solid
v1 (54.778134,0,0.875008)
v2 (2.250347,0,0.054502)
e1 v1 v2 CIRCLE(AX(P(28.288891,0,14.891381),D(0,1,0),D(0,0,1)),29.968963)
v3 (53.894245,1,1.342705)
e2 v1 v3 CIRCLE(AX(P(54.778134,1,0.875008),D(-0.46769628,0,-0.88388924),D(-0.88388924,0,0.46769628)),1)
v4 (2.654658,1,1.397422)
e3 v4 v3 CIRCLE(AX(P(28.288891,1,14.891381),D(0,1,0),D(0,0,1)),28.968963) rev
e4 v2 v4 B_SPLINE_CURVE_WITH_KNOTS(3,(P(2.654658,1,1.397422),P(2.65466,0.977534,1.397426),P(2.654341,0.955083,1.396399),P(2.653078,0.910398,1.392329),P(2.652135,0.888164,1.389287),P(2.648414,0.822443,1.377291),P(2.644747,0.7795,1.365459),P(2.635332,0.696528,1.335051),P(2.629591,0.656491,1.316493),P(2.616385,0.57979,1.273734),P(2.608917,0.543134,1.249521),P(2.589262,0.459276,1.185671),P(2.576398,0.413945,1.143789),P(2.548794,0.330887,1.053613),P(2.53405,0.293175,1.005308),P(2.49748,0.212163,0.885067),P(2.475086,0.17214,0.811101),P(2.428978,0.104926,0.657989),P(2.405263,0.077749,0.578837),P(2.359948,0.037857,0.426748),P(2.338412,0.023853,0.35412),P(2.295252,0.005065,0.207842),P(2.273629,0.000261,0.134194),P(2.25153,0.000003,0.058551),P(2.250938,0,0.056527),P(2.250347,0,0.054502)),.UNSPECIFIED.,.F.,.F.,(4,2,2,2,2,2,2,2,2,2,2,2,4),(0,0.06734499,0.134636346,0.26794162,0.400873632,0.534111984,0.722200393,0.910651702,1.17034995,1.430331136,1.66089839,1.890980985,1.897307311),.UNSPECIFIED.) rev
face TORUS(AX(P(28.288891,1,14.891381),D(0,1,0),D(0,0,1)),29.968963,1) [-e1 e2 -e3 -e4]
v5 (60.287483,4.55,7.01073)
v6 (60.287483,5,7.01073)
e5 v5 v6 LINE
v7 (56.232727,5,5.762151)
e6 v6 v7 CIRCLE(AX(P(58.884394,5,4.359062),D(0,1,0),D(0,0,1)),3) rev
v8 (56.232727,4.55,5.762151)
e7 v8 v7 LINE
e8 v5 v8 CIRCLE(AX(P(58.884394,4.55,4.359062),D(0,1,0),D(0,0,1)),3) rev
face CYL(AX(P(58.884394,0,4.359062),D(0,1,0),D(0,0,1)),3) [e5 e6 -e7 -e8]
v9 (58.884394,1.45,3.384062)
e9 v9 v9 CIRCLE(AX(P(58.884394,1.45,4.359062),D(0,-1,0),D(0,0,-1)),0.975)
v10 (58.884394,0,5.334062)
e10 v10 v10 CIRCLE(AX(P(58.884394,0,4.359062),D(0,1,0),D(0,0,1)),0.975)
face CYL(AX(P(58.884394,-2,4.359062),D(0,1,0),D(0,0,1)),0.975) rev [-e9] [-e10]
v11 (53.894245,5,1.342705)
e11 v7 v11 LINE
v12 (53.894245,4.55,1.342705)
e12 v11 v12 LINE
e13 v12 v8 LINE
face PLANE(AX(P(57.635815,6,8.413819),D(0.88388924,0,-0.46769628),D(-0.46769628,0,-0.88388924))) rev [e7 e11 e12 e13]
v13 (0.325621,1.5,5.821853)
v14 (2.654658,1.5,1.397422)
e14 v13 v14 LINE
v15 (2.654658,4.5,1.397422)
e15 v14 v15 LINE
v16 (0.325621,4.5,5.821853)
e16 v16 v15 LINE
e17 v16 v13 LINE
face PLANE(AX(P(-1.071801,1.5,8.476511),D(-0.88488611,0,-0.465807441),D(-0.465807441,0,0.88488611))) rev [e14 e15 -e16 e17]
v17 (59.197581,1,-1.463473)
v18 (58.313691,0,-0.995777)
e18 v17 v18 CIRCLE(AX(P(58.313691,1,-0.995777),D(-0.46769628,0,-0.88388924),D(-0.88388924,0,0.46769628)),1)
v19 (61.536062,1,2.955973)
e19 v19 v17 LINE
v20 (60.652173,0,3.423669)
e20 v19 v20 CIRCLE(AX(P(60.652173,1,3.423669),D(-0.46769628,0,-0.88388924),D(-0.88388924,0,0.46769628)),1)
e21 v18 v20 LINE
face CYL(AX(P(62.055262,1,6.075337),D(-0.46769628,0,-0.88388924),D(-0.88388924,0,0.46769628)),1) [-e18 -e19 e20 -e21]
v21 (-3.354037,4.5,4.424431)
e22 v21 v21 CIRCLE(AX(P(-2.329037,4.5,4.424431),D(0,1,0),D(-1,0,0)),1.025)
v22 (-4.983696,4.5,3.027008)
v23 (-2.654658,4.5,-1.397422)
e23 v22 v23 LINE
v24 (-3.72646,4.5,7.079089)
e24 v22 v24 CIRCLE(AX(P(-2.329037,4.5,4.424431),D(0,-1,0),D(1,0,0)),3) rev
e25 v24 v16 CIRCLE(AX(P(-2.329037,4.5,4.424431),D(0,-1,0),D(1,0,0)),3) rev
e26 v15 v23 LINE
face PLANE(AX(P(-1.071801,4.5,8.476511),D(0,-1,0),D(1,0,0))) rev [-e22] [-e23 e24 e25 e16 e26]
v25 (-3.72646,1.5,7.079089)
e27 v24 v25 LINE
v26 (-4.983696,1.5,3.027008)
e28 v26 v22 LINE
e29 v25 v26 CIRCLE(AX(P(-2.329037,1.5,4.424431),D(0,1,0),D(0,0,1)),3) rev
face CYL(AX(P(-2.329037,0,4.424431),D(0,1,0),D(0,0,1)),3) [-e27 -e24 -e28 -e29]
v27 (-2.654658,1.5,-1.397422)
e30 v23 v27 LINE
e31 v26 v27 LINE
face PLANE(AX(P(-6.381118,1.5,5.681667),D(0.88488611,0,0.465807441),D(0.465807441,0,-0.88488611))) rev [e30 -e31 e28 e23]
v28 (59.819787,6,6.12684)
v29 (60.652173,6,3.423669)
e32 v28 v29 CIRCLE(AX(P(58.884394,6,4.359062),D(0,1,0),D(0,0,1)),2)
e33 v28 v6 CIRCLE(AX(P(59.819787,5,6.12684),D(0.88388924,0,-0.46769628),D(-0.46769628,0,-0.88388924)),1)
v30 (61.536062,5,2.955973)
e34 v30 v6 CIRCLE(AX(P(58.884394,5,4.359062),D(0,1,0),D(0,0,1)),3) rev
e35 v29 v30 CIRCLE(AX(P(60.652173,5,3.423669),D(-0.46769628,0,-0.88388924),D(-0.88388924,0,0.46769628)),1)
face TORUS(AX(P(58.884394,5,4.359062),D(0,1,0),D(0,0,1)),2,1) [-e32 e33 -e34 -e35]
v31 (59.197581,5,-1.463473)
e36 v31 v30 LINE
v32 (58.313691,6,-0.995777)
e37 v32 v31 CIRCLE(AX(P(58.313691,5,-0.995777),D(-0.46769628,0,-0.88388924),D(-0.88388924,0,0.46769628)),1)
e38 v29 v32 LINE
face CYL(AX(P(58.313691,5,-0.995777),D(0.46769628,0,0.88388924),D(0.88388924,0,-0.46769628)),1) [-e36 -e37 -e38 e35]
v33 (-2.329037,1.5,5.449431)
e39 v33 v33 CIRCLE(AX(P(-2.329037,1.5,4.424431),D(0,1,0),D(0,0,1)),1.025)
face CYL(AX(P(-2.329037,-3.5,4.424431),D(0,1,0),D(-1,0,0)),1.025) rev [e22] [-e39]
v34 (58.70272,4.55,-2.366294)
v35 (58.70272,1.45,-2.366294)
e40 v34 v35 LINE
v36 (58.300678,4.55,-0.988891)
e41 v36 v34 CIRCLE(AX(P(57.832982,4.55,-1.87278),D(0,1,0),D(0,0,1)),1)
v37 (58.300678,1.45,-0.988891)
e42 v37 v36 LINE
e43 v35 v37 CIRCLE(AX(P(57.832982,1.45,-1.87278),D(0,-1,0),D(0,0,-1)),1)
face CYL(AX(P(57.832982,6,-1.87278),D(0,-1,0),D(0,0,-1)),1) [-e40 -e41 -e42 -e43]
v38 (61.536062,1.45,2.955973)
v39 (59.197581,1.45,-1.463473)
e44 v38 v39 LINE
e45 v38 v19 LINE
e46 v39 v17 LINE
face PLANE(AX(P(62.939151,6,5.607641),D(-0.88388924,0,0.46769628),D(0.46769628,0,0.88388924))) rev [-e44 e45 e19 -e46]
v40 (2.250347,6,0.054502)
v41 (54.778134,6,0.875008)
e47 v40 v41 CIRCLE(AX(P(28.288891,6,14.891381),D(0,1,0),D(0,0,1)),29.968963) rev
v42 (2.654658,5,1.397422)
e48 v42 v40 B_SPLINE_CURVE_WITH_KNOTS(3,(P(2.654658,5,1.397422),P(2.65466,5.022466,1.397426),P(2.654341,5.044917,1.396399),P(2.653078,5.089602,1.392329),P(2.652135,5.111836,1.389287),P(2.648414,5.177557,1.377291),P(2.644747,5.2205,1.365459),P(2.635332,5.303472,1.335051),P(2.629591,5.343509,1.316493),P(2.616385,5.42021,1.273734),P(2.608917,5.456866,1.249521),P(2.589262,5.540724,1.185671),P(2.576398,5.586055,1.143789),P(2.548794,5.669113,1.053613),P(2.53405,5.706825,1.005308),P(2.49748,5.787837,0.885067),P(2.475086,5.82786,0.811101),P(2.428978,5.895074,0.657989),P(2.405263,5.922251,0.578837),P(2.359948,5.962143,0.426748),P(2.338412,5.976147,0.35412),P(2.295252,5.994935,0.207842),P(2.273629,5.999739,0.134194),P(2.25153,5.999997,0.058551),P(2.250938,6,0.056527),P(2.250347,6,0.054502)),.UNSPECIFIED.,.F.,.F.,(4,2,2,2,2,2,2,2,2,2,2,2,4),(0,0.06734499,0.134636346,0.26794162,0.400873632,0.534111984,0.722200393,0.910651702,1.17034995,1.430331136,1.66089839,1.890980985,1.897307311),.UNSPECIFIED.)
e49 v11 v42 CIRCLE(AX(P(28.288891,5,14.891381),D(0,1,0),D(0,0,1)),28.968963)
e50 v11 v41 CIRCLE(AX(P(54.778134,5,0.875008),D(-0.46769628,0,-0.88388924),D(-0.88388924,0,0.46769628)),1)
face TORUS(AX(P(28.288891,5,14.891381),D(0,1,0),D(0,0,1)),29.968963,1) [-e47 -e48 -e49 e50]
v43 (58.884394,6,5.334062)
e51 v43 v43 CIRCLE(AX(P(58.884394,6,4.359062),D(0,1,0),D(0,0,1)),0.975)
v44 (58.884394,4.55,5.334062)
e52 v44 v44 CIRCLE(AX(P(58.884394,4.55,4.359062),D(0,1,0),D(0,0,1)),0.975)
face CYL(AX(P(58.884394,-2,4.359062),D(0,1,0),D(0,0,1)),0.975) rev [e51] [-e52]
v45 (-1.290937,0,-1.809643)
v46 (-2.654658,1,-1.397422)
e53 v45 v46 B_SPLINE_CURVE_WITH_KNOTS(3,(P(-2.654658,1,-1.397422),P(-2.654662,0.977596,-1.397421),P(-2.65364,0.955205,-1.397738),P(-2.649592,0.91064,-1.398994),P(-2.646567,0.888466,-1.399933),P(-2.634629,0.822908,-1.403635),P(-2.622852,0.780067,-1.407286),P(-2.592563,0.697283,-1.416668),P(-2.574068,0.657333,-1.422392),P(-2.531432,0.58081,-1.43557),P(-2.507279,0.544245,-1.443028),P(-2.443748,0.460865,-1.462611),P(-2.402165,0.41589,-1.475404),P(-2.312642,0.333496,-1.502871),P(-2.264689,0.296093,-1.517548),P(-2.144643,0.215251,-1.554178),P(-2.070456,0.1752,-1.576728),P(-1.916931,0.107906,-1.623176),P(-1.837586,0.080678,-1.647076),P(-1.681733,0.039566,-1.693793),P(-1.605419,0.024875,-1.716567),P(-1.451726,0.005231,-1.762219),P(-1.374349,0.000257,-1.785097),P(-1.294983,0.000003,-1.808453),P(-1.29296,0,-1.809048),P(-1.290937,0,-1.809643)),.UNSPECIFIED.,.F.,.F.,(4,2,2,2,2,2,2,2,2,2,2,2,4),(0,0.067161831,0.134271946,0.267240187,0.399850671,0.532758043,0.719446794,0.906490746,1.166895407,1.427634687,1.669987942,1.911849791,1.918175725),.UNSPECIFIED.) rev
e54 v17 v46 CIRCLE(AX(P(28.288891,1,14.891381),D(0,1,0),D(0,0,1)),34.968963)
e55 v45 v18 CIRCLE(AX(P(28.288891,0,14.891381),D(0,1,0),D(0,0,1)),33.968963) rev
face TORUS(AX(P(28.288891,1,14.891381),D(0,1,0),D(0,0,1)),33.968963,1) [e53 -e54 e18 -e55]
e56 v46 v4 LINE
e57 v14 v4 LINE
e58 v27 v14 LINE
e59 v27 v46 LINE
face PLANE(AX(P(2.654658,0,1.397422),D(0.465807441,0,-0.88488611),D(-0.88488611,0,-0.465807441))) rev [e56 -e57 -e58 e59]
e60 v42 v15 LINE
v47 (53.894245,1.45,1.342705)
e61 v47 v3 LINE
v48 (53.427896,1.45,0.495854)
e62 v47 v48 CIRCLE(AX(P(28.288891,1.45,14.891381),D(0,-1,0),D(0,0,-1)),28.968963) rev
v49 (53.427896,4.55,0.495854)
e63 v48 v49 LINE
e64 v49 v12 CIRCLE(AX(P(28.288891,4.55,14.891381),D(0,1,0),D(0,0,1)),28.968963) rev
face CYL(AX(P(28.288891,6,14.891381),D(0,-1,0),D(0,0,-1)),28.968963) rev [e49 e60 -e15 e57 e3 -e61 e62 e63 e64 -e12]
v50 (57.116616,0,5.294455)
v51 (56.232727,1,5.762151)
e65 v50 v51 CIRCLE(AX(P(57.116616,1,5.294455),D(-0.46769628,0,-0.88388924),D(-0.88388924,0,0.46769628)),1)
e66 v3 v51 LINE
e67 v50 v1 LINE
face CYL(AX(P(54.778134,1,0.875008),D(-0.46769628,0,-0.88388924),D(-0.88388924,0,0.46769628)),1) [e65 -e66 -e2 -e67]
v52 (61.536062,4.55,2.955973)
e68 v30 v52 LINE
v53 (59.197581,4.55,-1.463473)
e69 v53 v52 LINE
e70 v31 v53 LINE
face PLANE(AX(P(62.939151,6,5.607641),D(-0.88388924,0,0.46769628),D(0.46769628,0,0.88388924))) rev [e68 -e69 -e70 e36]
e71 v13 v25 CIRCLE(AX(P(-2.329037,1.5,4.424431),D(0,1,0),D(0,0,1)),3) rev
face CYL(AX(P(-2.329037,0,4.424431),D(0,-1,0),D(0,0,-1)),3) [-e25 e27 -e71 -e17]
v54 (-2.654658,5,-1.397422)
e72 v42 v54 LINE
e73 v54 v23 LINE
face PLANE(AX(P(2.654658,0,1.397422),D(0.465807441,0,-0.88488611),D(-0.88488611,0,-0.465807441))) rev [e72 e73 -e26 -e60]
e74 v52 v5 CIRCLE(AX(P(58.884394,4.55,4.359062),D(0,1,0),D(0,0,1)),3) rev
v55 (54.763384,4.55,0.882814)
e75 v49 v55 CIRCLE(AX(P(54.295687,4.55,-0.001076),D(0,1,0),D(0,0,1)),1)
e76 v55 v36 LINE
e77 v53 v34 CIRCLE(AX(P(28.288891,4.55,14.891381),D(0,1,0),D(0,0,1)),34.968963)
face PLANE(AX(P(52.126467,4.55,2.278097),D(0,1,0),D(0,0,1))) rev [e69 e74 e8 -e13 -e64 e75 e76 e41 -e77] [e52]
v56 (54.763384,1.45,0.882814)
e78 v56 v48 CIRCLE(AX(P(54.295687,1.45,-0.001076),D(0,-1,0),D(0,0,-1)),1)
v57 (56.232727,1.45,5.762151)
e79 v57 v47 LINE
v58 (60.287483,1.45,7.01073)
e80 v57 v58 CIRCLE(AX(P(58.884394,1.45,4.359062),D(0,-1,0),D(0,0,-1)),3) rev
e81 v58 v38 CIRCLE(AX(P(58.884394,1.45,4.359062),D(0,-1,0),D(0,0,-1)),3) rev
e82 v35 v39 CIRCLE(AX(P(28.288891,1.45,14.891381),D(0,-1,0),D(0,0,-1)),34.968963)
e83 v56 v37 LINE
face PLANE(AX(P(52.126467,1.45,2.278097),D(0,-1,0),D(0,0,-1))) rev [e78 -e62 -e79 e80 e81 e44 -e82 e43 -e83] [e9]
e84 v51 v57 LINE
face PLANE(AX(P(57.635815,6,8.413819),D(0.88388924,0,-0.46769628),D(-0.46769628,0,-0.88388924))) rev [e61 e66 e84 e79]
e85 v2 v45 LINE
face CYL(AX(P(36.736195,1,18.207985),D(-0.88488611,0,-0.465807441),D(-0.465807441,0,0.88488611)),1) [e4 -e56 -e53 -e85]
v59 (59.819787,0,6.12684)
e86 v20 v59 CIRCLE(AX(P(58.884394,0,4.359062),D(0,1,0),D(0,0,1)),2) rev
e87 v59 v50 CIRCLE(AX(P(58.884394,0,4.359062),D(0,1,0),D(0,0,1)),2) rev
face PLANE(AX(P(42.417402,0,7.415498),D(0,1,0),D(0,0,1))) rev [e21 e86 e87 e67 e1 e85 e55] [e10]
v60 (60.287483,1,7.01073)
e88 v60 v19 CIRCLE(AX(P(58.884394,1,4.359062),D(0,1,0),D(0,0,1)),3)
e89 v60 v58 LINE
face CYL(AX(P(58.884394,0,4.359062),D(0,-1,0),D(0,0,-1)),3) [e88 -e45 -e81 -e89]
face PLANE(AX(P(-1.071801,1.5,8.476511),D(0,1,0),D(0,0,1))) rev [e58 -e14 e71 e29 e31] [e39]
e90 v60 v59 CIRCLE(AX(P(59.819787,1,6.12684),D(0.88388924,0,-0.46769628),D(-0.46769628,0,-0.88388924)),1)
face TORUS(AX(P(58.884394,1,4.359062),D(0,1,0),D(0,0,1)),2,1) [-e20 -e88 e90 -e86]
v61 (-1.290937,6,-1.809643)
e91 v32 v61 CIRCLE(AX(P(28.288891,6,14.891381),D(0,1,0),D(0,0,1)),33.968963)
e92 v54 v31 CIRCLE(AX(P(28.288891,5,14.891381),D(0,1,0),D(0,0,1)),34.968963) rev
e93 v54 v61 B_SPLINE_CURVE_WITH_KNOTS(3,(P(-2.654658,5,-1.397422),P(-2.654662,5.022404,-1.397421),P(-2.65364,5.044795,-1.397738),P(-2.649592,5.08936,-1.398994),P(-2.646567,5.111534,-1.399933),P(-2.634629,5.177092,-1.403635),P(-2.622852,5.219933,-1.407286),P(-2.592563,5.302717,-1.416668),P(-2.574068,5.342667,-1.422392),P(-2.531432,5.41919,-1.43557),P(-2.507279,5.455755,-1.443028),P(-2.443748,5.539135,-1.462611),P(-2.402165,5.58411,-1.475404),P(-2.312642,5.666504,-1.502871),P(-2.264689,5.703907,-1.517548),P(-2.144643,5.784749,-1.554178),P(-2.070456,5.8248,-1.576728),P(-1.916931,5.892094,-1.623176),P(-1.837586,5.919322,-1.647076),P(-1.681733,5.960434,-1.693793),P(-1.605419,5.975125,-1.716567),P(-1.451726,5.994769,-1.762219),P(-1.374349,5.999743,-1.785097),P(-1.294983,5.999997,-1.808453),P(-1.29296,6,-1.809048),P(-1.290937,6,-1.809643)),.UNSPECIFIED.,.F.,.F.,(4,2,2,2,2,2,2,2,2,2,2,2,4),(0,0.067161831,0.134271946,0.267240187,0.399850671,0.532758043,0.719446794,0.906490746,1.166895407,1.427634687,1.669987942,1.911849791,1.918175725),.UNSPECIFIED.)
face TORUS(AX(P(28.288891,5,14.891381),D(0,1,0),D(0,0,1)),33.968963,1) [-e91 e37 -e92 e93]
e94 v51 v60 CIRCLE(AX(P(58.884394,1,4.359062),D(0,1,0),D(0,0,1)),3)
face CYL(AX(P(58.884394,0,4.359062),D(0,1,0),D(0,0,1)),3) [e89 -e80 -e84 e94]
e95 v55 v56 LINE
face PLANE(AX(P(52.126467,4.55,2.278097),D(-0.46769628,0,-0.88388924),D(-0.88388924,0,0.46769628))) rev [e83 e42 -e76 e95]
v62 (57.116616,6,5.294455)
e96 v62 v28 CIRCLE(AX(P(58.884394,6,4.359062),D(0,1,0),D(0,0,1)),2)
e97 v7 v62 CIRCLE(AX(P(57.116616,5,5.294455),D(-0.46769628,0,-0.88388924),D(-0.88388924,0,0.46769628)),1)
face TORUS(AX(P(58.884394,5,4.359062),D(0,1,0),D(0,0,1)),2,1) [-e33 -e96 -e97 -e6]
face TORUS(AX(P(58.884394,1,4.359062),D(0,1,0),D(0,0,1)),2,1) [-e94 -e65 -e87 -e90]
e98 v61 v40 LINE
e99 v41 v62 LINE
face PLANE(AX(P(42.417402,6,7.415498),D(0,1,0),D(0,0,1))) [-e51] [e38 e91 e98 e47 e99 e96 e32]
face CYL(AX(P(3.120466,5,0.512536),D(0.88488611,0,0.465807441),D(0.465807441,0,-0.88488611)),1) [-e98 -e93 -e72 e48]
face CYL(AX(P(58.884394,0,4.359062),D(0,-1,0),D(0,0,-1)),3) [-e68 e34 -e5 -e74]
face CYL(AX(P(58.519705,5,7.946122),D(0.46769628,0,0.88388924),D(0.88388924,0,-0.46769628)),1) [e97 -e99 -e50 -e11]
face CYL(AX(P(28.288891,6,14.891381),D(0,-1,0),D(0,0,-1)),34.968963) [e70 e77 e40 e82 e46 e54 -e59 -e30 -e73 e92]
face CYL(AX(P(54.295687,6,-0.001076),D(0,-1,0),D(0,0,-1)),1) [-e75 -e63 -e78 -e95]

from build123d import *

# Parameters (mm, degrees)
BOSS_EXTRUDE1_DEPTH = 6
CUT_EXTRUDE1_DEPTH  = 6
SKETCH3_W           = 6
SKETCH3_H           = 6
BOSS_EXTRUDE2_DEPTH = 8
SKETCH5_W           = 8
SKETCH5_H           = 3.1
CUT_EXTRUDE2_DEPTH  = 8
SKETCH6_R           = 0.975
CUT_EXTRUDE3_DEPTH  = 8
SKETCH7_W           = 6
SKETCH7_H           = 3
BOSS_EXTRUDE3_DEPTH = 8
SKETCH8_R           = 1.025
CUT_EXTRUDE4_DEPTH  = 8
FILLET1_R           = 3
FILLET2_R           = 1


with BuildPart() as part:
    # Sketch1 → Boss-Extrude1 (new body)
    with BuildSketch(Plane(origin=(0, 0, 0), x_dir=(1, 0, 0), z_dir=(0, 1, 0))):
        with BuildLine():
            ThreePointArc((59.197580629, 1.463473077), (28.251548273, 20.077561964), (-2.65465833, 1.397422323))
            ThreePointArc((-2.65465833, 1.397422323), (-1.397422323, -2.65465833), (2.65465833, -1.397422323))
            ThreePointArc((2.65465833, -1.397422323), (28.257955548, 14.077565385), (53.894245187, -1.342704605))
            ThreePointArc((53.894245187, -1.342704605), (57.949001749, -2.591283485), (59.197580629, 1.463473077))
        make_face()
    extrude(amount=BOSS_EXTRUDE1_DEPTH)

    # Sketch2 → Cut-Extrude1 (cut)
    with BuildSketch(Plane(origin=(0, 6, 0), x_dir=(1, 0, 0), z_dir=(0, 1, 0))):
        Polygon((53.894245187, -1.342704605), (59.197580629, 1.463473077), (61.240293877, -2.397007189), (55.867953369, -5.072773667), align=None)
        Polygon((2.65465833, -1.397422323), (-2.65465833, 1.397422323), (-5.113209947, -2.397007189), (1.520441913, -5.715494495), align=None)
    extrude(amount=-CUT_EXTRUDE1_DEPTH, mode=Mode.SUBTRACT)

    # Sketch3 → Boss-Extrude2 (add)
    with BuildSketch(Plane(origin=(12.343879945, 0, 23.328435834), x_dir=(0.883889240381717, 0, -0.46769628044002154), z_dir=(0.4676962804400216, 0, 0.8838892403817171))):
        with Locations((50.008565489, 3)):
            Rectangle(SKETCH3_W, SKETCH3_H)
    extrude(amount=BOSS_EXTRUDE2_DEPTH)

    # Sketch5 → Cut-Extrude2 (cut)
    with BuildSketch(Plane(origin=(46.853700684, 0, -24.791908911), x_dir=(-0.46769628044002165, 0, -0.883889240381717), z_dir=(0.883889240381717, 0, -0.46769628044002165))):
        with Locations((-30.392940165, 3)):
            Rectangle(SKETCH5_W, SKETCH5_H)
    extrude(amount=-CUT_EXTRUDE2_DEPTH, mode=Mode.SUBTRACT)

    # Sketch6 → Cut-Extrude3 (cut)
    with BuildSketch(Plane(origin=(0, 6, 0), x_dir=(1, 0, 0), z_dir=(0, 1, 0))):
        with Locations(Location((58.88439431, -4.359061966, 0), (0, 0, 270))):
            Circle(SKETCH6_R)
    extrude(amount=-CUT_EXTRUDE3_DEPTH, mode=Mode.SUBTRACT)

    # Sketch7 → Boss-Extrude3 (add)
    with BuildSketch(Plane(origin=(0, 0, 0), x_dir=(0.8848861101120022, 0, 0.4658074410428085), z_dir=(-0.4658074410428085, 0, 0.8848861101120022))):
        with Locations((0, 3)):
            Rectangle(SKETCH7_W, SKETCH7_H)
    extrude(amount=BOSS_EXTRUDE3_DEPTH)

    # Sketch8 → Cut-Extrude4 (cut)
    with BuildSketch(Plane(origin=(0, 4.5, 0), x_dir=(1, 0, 0), z_dir=(0, 1, 0))):
        with Locations(Location((-2.329037205, -4.424430551, 0), (0, 0, 180))):
            Circle(SKETCH8_R)
    extrude(amount=-CUT_EXTRUDE4_DEPTH, mode=Mode.SUBTRACT)

    # Fillet1
    fillet1_edges = [part.edges().sort_by_distance(p)[0] for p in [
        (57.63581543, 5.275, 8.413818528),
        (57.63581543, 0.725, 8.413818528),
        (62.939150873, 0.725, 5.607640846),
        (62.939150873, 5.275, 5.607640846),
        (-1.071801198, 3, 8.476511204),
        (-6.381117859, 3, 5.681666558),
    ]]
    fillet(fillet1_edges, radius=FILLET1_R - 0.0001)  # a hair under: the kernel refuses the full size

    # Fillet2
    fillet2_edges = [part.edges().sort_by_distance(p)[0] for p in [
        (28.251548273, 0, -20.077561964),
        (28.251548273, 6, -20.077561964),
        (60.366844715, 0, 0.746294218),
        (61.751579759, 0, 5.241952749),
        (58.001503527, 0, 7.226247414),
        (55.063509273, 0, 3.552471901),
        (60.366844715, 6, 0.746294218),
        (61.751579759, 6, 5.241952749),
        (58.001503527, 6, 7.226247414),
        (55.063509273, 6, 3.552471901),
        (53.894245187, 3, 1.342704605),
        (59.197580629, 3, -1.463473077),
        (0, 0, 0),
        (0, 6, 0),
        (28.257955548, 0, -14.077565385),
        (28.257955548, 6, -14.077565385),
    ]]
    fillet(fillet2_edges, radius=FILLET2_R)


solid = part.part
